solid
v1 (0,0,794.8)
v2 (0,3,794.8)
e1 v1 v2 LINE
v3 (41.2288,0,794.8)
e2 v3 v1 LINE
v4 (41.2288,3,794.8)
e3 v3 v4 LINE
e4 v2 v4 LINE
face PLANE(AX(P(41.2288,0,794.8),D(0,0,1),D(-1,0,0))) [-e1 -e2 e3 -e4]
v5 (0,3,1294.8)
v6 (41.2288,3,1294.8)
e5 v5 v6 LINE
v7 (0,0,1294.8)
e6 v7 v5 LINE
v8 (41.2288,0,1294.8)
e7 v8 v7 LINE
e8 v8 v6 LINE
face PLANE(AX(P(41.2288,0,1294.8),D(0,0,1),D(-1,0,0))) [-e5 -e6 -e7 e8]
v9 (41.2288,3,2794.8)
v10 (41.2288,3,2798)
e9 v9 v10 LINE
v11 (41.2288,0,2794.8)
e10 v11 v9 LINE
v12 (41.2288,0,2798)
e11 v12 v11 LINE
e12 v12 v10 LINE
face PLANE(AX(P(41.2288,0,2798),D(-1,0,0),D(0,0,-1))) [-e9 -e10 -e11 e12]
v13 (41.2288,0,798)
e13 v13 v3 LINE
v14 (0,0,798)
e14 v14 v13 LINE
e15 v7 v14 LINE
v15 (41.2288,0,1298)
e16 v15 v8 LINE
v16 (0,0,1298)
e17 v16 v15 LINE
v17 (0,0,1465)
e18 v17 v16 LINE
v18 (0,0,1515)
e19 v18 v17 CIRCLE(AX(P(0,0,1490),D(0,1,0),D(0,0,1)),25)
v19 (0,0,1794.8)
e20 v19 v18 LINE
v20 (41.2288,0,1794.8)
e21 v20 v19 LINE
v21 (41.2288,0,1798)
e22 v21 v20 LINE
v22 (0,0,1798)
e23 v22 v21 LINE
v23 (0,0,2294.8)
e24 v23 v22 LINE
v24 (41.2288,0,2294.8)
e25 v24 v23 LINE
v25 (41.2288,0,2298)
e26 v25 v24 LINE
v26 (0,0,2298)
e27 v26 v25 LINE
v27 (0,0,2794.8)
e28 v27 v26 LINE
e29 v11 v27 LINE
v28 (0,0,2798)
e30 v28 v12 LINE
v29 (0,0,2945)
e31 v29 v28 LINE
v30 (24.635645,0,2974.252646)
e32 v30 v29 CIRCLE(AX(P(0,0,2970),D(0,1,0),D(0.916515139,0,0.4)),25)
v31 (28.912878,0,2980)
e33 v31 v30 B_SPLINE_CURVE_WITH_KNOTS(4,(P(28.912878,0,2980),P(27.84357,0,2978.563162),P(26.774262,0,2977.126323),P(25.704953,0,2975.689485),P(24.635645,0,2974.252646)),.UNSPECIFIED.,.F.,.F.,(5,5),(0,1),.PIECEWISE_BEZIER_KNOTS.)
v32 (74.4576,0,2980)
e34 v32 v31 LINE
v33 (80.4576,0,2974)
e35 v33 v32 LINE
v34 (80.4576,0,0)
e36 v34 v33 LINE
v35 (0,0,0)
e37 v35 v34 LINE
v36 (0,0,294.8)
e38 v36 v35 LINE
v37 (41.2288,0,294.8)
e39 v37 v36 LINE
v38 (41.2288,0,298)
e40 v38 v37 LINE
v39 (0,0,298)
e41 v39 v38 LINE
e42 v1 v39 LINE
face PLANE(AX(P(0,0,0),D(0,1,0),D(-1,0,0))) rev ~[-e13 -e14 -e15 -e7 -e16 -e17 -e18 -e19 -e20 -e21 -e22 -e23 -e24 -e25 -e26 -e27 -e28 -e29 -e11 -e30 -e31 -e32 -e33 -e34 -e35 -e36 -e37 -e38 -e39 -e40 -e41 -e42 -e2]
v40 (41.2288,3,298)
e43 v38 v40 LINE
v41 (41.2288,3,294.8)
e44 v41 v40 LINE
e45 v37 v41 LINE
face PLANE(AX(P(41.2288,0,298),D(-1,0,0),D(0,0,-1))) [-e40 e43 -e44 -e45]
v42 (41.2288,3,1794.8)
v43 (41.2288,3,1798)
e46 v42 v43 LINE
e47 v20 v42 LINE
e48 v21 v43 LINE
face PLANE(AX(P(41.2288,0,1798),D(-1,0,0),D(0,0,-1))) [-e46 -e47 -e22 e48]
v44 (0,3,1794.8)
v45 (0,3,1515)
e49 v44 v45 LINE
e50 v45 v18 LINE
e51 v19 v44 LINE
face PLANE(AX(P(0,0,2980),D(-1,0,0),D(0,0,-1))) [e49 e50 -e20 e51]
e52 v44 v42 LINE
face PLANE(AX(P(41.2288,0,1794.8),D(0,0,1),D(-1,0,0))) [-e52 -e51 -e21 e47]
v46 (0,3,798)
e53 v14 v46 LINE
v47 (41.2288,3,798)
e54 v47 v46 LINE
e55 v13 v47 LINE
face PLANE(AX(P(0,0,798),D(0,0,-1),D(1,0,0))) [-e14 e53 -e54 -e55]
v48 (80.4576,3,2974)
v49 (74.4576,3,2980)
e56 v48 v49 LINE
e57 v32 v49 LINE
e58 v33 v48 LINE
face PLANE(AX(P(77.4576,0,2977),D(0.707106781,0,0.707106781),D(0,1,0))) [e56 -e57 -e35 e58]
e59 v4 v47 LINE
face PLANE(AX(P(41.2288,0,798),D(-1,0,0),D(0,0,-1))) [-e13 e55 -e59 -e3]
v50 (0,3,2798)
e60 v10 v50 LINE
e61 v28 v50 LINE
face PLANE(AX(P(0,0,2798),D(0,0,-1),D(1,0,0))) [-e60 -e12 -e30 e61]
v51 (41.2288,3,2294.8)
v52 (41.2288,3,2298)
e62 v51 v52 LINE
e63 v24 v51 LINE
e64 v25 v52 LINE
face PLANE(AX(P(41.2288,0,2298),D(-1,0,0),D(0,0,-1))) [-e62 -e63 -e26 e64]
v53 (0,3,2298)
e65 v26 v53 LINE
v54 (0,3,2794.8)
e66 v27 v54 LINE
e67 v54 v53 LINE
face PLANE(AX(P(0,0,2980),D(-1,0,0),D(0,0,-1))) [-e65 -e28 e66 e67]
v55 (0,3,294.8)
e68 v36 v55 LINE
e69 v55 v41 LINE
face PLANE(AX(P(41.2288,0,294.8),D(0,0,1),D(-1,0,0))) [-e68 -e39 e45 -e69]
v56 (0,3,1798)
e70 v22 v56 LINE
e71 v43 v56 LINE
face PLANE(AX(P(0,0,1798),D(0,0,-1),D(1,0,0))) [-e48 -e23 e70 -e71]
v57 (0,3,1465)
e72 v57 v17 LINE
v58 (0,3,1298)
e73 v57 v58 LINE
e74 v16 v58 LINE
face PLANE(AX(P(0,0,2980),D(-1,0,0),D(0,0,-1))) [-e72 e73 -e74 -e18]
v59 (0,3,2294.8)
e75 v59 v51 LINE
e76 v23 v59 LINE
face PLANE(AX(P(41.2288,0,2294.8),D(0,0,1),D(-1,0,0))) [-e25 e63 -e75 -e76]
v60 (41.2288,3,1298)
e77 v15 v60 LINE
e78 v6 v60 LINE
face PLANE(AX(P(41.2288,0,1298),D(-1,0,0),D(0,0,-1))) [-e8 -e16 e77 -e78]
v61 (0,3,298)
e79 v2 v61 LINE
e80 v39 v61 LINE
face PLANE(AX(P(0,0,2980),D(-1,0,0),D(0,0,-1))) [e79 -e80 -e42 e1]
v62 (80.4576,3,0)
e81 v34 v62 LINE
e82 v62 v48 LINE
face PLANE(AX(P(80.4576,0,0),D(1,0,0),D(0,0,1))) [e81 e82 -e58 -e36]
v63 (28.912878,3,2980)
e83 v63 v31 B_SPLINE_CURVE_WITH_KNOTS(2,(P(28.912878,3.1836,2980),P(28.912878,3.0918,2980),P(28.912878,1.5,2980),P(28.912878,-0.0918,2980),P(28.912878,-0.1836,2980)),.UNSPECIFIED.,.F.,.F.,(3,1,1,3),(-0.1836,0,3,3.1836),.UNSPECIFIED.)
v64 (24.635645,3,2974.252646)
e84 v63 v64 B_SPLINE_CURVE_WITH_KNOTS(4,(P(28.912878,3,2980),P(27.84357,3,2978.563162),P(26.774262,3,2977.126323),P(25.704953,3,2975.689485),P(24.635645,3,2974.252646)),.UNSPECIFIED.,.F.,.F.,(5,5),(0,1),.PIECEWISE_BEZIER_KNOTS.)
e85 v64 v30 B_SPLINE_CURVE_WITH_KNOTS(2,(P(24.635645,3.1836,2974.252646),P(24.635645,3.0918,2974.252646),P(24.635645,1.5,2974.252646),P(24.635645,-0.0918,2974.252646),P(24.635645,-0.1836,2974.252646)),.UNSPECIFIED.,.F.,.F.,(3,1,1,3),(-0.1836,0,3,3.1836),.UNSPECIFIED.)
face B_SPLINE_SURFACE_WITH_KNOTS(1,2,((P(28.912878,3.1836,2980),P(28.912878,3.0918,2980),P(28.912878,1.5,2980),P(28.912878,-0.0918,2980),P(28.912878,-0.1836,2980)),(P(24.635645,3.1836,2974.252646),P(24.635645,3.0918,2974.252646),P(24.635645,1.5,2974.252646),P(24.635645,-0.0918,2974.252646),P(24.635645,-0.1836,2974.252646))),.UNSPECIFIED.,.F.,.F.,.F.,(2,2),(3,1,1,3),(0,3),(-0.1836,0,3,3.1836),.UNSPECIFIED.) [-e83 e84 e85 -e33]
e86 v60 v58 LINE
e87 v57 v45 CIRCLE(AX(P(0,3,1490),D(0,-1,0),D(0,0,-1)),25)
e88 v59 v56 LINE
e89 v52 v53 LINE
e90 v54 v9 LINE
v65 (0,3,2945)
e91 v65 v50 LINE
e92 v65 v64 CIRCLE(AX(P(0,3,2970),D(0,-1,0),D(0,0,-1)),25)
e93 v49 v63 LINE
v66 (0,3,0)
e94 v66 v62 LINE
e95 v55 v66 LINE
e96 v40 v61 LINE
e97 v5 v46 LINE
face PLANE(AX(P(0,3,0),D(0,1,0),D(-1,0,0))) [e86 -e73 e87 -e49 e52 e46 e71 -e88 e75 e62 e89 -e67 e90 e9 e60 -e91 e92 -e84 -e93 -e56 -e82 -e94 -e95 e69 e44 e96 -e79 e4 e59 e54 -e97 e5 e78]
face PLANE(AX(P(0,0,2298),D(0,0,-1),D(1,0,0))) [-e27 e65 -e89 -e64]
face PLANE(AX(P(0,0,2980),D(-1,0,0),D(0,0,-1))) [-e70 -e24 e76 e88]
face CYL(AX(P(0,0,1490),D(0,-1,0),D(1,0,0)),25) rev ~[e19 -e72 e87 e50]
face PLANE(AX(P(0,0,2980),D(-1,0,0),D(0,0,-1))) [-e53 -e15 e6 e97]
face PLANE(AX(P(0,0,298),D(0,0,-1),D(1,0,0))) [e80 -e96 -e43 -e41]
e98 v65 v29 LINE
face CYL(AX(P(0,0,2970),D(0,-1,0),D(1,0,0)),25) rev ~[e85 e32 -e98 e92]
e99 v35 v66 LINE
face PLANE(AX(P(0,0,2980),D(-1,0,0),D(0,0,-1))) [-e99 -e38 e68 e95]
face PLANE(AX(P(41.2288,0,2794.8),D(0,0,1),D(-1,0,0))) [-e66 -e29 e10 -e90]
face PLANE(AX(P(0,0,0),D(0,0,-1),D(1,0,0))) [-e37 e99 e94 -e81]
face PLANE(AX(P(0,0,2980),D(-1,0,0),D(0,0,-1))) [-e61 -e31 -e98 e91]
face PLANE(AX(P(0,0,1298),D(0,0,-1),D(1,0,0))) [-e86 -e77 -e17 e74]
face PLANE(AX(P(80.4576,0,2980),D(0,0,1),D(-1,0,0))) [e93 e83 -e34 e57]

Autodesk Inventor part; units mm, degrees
ref_plane "YZ Plane" through (0, 0, 0) normal (1, 0, 0) x (0, 1, 0)
ref_plane "XZ Plane" through (0, 0, 0) normal (0, 1, 0) x (-1, 0, 0)
ref_plane "XY Plane" through (0, 0, 0) normal (0, 0, 1) x (1, 0, 0)
sketch "Sketch6" plane through (0, 0, 0) normal (0, 1, 0) x (-1, 0, 0)
  line L0 (0, 0) -> (-80.4576, 0)
  line L1 (-80.4576, 0) -> (-80.4576, 2980)
  line L2 (-80.4576, 2980) -> (0, 2980)
  line L3 (0, 2980) -> (0, 0)
  dimension "d26" = 80.4576
  dimension "d27" = 2980
extrude "Plate4" add sketch "Sketch6" along normal blind 3
sketch "Sketch9" plane through (0, 3, 0) normal (0, 1, 0) x (1, 0, 0)
  line L0 (0, -2980) -> (0, 0) projected
  line L1 (80.4576, -2980) -> (0, -2980) projected
  line L2 (80.4576, 0) -> (80.4576, -2980) projected
  line L3 (0, 0) -> (80.4576, 0) projected
  line L4 (25, -2762.0797) -> (10, -2762.0797) construction
  line L5 (10, -2762.0797) -> (10, -2562.0797) construction
  line L6 (10, -2562.0797) -> (25, -2562.0797) construction
  line L7 (25, -2562.0797) -> (25, -2762.0797) construction
  dimension "d44" = 200
  dimension "d45" = 15
  dimension "d47" = 10
mark "Mark1"
sketch "Sketch7" plane through (0, 0, 0) normal (0, -1, 0) x (1, 0, 0)
  line L0 (0, 2980) -> (80.4576, 2980) projected
  line L1 (0, 0) -> (0, 2980) projected
  line L2 (80.4576, 0) -> (0, 0) projected
  line L3 (80.4576, 2980) -> (80.4576, 0) projected
  line L4 (0, 2798) -> (41.2288, 2798)
  line L5 (41.2288, 2798) -> (41.2288, 2794.8)
  line L6 (41.2288, 2794.8) -> (0, 2794.8)
  line L7 (0, 2794.8) -> (0, 2798)
  point P0 (0, 2794.8)
  point P1 (0, 200)
  point P2 (46.4173, 200)
  point P3 (0, 2794.8)
  dimension "d29" = 41.2288
  dimension "d30" = 3.2
  dimension "d51" = 182
extrude "Extrusion2" cut sketch "Sketch7" against normal through all contours L4 L5 L6 L1
pattern_linear "Rectangular Pattern1" count 6 spacing 500 along (0, 0, -1) of "Extrusion2"
sketch "Sketch8" plane through (0, 0, 0) normal (0, -1, 0) x (1, 0, 0)
  line L0 (0, 2798) -> (41.2288, 2798) projected
  line L1 (41.2288, 2798) -> (41.2288, 2794.8) projected
  line L2 (41.2288, 2794.8) -> (0, 2794.8) projected
  line L3 (0, 0) -> (0, 294.8) projected
  line L4 (80.4576, 0) -> (0, 0) projected
  line L5 (80.4576, 2980) -> (80.4576, 0) projected
  line L6 (0, 2980) -> (80.4576, 2980) projected
  circle A0 centre (0, 1490) radius 25
  line L7 (0, 2798) -> (0, 2980) projected
  line L8 (0, 298) -> (41.2288, 298) projected
  line L9 (41.2288, 298) -> (41.2288, 294.8) projected
  line L10 (41.2288, 294.8) -> (0, 294.8) projected
  line L11 (0, 2298) -> (0, 2794.8) projected
  line L12 (0, 2298) -> (41.2288, 2298) projected
  line L13 (41.2288, 2298) -> (41.2288, 2294.8) projected
  line L14 (41.2288, 2294.8) -> (0, 2294.8) projected
  line L15 (0, 1798) -> (0, 2294.8) projected
  line L16 (0, 1798) -> (41.2288, 1798) projected
  line L17 (41.2288, 1798) -> (41.2288, 1794.8) projected
  line L18 (41.2288, 1794.8) -> (0, 1794.8) projected
  line L19 (0, 1298) -> (0, 1794.8) projected
  line L20 (0, 1298) -> (41.2288, 1298) projected
  line L21 (41.2288, 1298) -> (41.2288, 1294.8) projected
  line L22 (41.2288, 1294.8) -> (0, 1294.8) projected
  line L23 (0, 798) -> (0, 1294.8) projected
  line L24 (0, 798) -> (41.2288, 798) projected
  line L25 (41.2288, 798) -> (41.2288, 794.8) projected
  line L26 (41.2288, 794.8) -> (0, 794.8) projected
  line L27 (0, 298) -> (0, 794.8) projected
  dimension "d37" = 50
  dimension "d38" = 1490
extrude "Extrusion3" cut sketch "Sketch8" against normal through all contours L19 A0 | A0 L19
pattern_linear "Rectangular Pattern2" count 2 spacing 1480 along (0, 0, 1) of "Extrusion3"
chamfer "Corner Chamfer1" distance 6 angle 45 2 edges at (22.9129, 1.5, 2980) (80.4576, 1.5, 2980)
equation "\"d28\" = Thickness"
equation "\"BendReliefWidth\" = Thickness"
equation "\"BendReliefDepth\" = 0.5 * Thickness"
equation "\"CornerReliefSize\" = 4 * Thickness"
equation "\"MinimumRemnant\" = 2 * Thickness"
equation "\"TransitionRadius\" = BendRadius"
equation "\"JacobiRadiusSize\" = BendRadius"
equation "\"GapSize\" = Thickness"
equation "\"Thickness\" = 3"
equation "\"BendRadius\" = 5"
properties part number "BSH 0341 stringer board 2" material "09g2s"
